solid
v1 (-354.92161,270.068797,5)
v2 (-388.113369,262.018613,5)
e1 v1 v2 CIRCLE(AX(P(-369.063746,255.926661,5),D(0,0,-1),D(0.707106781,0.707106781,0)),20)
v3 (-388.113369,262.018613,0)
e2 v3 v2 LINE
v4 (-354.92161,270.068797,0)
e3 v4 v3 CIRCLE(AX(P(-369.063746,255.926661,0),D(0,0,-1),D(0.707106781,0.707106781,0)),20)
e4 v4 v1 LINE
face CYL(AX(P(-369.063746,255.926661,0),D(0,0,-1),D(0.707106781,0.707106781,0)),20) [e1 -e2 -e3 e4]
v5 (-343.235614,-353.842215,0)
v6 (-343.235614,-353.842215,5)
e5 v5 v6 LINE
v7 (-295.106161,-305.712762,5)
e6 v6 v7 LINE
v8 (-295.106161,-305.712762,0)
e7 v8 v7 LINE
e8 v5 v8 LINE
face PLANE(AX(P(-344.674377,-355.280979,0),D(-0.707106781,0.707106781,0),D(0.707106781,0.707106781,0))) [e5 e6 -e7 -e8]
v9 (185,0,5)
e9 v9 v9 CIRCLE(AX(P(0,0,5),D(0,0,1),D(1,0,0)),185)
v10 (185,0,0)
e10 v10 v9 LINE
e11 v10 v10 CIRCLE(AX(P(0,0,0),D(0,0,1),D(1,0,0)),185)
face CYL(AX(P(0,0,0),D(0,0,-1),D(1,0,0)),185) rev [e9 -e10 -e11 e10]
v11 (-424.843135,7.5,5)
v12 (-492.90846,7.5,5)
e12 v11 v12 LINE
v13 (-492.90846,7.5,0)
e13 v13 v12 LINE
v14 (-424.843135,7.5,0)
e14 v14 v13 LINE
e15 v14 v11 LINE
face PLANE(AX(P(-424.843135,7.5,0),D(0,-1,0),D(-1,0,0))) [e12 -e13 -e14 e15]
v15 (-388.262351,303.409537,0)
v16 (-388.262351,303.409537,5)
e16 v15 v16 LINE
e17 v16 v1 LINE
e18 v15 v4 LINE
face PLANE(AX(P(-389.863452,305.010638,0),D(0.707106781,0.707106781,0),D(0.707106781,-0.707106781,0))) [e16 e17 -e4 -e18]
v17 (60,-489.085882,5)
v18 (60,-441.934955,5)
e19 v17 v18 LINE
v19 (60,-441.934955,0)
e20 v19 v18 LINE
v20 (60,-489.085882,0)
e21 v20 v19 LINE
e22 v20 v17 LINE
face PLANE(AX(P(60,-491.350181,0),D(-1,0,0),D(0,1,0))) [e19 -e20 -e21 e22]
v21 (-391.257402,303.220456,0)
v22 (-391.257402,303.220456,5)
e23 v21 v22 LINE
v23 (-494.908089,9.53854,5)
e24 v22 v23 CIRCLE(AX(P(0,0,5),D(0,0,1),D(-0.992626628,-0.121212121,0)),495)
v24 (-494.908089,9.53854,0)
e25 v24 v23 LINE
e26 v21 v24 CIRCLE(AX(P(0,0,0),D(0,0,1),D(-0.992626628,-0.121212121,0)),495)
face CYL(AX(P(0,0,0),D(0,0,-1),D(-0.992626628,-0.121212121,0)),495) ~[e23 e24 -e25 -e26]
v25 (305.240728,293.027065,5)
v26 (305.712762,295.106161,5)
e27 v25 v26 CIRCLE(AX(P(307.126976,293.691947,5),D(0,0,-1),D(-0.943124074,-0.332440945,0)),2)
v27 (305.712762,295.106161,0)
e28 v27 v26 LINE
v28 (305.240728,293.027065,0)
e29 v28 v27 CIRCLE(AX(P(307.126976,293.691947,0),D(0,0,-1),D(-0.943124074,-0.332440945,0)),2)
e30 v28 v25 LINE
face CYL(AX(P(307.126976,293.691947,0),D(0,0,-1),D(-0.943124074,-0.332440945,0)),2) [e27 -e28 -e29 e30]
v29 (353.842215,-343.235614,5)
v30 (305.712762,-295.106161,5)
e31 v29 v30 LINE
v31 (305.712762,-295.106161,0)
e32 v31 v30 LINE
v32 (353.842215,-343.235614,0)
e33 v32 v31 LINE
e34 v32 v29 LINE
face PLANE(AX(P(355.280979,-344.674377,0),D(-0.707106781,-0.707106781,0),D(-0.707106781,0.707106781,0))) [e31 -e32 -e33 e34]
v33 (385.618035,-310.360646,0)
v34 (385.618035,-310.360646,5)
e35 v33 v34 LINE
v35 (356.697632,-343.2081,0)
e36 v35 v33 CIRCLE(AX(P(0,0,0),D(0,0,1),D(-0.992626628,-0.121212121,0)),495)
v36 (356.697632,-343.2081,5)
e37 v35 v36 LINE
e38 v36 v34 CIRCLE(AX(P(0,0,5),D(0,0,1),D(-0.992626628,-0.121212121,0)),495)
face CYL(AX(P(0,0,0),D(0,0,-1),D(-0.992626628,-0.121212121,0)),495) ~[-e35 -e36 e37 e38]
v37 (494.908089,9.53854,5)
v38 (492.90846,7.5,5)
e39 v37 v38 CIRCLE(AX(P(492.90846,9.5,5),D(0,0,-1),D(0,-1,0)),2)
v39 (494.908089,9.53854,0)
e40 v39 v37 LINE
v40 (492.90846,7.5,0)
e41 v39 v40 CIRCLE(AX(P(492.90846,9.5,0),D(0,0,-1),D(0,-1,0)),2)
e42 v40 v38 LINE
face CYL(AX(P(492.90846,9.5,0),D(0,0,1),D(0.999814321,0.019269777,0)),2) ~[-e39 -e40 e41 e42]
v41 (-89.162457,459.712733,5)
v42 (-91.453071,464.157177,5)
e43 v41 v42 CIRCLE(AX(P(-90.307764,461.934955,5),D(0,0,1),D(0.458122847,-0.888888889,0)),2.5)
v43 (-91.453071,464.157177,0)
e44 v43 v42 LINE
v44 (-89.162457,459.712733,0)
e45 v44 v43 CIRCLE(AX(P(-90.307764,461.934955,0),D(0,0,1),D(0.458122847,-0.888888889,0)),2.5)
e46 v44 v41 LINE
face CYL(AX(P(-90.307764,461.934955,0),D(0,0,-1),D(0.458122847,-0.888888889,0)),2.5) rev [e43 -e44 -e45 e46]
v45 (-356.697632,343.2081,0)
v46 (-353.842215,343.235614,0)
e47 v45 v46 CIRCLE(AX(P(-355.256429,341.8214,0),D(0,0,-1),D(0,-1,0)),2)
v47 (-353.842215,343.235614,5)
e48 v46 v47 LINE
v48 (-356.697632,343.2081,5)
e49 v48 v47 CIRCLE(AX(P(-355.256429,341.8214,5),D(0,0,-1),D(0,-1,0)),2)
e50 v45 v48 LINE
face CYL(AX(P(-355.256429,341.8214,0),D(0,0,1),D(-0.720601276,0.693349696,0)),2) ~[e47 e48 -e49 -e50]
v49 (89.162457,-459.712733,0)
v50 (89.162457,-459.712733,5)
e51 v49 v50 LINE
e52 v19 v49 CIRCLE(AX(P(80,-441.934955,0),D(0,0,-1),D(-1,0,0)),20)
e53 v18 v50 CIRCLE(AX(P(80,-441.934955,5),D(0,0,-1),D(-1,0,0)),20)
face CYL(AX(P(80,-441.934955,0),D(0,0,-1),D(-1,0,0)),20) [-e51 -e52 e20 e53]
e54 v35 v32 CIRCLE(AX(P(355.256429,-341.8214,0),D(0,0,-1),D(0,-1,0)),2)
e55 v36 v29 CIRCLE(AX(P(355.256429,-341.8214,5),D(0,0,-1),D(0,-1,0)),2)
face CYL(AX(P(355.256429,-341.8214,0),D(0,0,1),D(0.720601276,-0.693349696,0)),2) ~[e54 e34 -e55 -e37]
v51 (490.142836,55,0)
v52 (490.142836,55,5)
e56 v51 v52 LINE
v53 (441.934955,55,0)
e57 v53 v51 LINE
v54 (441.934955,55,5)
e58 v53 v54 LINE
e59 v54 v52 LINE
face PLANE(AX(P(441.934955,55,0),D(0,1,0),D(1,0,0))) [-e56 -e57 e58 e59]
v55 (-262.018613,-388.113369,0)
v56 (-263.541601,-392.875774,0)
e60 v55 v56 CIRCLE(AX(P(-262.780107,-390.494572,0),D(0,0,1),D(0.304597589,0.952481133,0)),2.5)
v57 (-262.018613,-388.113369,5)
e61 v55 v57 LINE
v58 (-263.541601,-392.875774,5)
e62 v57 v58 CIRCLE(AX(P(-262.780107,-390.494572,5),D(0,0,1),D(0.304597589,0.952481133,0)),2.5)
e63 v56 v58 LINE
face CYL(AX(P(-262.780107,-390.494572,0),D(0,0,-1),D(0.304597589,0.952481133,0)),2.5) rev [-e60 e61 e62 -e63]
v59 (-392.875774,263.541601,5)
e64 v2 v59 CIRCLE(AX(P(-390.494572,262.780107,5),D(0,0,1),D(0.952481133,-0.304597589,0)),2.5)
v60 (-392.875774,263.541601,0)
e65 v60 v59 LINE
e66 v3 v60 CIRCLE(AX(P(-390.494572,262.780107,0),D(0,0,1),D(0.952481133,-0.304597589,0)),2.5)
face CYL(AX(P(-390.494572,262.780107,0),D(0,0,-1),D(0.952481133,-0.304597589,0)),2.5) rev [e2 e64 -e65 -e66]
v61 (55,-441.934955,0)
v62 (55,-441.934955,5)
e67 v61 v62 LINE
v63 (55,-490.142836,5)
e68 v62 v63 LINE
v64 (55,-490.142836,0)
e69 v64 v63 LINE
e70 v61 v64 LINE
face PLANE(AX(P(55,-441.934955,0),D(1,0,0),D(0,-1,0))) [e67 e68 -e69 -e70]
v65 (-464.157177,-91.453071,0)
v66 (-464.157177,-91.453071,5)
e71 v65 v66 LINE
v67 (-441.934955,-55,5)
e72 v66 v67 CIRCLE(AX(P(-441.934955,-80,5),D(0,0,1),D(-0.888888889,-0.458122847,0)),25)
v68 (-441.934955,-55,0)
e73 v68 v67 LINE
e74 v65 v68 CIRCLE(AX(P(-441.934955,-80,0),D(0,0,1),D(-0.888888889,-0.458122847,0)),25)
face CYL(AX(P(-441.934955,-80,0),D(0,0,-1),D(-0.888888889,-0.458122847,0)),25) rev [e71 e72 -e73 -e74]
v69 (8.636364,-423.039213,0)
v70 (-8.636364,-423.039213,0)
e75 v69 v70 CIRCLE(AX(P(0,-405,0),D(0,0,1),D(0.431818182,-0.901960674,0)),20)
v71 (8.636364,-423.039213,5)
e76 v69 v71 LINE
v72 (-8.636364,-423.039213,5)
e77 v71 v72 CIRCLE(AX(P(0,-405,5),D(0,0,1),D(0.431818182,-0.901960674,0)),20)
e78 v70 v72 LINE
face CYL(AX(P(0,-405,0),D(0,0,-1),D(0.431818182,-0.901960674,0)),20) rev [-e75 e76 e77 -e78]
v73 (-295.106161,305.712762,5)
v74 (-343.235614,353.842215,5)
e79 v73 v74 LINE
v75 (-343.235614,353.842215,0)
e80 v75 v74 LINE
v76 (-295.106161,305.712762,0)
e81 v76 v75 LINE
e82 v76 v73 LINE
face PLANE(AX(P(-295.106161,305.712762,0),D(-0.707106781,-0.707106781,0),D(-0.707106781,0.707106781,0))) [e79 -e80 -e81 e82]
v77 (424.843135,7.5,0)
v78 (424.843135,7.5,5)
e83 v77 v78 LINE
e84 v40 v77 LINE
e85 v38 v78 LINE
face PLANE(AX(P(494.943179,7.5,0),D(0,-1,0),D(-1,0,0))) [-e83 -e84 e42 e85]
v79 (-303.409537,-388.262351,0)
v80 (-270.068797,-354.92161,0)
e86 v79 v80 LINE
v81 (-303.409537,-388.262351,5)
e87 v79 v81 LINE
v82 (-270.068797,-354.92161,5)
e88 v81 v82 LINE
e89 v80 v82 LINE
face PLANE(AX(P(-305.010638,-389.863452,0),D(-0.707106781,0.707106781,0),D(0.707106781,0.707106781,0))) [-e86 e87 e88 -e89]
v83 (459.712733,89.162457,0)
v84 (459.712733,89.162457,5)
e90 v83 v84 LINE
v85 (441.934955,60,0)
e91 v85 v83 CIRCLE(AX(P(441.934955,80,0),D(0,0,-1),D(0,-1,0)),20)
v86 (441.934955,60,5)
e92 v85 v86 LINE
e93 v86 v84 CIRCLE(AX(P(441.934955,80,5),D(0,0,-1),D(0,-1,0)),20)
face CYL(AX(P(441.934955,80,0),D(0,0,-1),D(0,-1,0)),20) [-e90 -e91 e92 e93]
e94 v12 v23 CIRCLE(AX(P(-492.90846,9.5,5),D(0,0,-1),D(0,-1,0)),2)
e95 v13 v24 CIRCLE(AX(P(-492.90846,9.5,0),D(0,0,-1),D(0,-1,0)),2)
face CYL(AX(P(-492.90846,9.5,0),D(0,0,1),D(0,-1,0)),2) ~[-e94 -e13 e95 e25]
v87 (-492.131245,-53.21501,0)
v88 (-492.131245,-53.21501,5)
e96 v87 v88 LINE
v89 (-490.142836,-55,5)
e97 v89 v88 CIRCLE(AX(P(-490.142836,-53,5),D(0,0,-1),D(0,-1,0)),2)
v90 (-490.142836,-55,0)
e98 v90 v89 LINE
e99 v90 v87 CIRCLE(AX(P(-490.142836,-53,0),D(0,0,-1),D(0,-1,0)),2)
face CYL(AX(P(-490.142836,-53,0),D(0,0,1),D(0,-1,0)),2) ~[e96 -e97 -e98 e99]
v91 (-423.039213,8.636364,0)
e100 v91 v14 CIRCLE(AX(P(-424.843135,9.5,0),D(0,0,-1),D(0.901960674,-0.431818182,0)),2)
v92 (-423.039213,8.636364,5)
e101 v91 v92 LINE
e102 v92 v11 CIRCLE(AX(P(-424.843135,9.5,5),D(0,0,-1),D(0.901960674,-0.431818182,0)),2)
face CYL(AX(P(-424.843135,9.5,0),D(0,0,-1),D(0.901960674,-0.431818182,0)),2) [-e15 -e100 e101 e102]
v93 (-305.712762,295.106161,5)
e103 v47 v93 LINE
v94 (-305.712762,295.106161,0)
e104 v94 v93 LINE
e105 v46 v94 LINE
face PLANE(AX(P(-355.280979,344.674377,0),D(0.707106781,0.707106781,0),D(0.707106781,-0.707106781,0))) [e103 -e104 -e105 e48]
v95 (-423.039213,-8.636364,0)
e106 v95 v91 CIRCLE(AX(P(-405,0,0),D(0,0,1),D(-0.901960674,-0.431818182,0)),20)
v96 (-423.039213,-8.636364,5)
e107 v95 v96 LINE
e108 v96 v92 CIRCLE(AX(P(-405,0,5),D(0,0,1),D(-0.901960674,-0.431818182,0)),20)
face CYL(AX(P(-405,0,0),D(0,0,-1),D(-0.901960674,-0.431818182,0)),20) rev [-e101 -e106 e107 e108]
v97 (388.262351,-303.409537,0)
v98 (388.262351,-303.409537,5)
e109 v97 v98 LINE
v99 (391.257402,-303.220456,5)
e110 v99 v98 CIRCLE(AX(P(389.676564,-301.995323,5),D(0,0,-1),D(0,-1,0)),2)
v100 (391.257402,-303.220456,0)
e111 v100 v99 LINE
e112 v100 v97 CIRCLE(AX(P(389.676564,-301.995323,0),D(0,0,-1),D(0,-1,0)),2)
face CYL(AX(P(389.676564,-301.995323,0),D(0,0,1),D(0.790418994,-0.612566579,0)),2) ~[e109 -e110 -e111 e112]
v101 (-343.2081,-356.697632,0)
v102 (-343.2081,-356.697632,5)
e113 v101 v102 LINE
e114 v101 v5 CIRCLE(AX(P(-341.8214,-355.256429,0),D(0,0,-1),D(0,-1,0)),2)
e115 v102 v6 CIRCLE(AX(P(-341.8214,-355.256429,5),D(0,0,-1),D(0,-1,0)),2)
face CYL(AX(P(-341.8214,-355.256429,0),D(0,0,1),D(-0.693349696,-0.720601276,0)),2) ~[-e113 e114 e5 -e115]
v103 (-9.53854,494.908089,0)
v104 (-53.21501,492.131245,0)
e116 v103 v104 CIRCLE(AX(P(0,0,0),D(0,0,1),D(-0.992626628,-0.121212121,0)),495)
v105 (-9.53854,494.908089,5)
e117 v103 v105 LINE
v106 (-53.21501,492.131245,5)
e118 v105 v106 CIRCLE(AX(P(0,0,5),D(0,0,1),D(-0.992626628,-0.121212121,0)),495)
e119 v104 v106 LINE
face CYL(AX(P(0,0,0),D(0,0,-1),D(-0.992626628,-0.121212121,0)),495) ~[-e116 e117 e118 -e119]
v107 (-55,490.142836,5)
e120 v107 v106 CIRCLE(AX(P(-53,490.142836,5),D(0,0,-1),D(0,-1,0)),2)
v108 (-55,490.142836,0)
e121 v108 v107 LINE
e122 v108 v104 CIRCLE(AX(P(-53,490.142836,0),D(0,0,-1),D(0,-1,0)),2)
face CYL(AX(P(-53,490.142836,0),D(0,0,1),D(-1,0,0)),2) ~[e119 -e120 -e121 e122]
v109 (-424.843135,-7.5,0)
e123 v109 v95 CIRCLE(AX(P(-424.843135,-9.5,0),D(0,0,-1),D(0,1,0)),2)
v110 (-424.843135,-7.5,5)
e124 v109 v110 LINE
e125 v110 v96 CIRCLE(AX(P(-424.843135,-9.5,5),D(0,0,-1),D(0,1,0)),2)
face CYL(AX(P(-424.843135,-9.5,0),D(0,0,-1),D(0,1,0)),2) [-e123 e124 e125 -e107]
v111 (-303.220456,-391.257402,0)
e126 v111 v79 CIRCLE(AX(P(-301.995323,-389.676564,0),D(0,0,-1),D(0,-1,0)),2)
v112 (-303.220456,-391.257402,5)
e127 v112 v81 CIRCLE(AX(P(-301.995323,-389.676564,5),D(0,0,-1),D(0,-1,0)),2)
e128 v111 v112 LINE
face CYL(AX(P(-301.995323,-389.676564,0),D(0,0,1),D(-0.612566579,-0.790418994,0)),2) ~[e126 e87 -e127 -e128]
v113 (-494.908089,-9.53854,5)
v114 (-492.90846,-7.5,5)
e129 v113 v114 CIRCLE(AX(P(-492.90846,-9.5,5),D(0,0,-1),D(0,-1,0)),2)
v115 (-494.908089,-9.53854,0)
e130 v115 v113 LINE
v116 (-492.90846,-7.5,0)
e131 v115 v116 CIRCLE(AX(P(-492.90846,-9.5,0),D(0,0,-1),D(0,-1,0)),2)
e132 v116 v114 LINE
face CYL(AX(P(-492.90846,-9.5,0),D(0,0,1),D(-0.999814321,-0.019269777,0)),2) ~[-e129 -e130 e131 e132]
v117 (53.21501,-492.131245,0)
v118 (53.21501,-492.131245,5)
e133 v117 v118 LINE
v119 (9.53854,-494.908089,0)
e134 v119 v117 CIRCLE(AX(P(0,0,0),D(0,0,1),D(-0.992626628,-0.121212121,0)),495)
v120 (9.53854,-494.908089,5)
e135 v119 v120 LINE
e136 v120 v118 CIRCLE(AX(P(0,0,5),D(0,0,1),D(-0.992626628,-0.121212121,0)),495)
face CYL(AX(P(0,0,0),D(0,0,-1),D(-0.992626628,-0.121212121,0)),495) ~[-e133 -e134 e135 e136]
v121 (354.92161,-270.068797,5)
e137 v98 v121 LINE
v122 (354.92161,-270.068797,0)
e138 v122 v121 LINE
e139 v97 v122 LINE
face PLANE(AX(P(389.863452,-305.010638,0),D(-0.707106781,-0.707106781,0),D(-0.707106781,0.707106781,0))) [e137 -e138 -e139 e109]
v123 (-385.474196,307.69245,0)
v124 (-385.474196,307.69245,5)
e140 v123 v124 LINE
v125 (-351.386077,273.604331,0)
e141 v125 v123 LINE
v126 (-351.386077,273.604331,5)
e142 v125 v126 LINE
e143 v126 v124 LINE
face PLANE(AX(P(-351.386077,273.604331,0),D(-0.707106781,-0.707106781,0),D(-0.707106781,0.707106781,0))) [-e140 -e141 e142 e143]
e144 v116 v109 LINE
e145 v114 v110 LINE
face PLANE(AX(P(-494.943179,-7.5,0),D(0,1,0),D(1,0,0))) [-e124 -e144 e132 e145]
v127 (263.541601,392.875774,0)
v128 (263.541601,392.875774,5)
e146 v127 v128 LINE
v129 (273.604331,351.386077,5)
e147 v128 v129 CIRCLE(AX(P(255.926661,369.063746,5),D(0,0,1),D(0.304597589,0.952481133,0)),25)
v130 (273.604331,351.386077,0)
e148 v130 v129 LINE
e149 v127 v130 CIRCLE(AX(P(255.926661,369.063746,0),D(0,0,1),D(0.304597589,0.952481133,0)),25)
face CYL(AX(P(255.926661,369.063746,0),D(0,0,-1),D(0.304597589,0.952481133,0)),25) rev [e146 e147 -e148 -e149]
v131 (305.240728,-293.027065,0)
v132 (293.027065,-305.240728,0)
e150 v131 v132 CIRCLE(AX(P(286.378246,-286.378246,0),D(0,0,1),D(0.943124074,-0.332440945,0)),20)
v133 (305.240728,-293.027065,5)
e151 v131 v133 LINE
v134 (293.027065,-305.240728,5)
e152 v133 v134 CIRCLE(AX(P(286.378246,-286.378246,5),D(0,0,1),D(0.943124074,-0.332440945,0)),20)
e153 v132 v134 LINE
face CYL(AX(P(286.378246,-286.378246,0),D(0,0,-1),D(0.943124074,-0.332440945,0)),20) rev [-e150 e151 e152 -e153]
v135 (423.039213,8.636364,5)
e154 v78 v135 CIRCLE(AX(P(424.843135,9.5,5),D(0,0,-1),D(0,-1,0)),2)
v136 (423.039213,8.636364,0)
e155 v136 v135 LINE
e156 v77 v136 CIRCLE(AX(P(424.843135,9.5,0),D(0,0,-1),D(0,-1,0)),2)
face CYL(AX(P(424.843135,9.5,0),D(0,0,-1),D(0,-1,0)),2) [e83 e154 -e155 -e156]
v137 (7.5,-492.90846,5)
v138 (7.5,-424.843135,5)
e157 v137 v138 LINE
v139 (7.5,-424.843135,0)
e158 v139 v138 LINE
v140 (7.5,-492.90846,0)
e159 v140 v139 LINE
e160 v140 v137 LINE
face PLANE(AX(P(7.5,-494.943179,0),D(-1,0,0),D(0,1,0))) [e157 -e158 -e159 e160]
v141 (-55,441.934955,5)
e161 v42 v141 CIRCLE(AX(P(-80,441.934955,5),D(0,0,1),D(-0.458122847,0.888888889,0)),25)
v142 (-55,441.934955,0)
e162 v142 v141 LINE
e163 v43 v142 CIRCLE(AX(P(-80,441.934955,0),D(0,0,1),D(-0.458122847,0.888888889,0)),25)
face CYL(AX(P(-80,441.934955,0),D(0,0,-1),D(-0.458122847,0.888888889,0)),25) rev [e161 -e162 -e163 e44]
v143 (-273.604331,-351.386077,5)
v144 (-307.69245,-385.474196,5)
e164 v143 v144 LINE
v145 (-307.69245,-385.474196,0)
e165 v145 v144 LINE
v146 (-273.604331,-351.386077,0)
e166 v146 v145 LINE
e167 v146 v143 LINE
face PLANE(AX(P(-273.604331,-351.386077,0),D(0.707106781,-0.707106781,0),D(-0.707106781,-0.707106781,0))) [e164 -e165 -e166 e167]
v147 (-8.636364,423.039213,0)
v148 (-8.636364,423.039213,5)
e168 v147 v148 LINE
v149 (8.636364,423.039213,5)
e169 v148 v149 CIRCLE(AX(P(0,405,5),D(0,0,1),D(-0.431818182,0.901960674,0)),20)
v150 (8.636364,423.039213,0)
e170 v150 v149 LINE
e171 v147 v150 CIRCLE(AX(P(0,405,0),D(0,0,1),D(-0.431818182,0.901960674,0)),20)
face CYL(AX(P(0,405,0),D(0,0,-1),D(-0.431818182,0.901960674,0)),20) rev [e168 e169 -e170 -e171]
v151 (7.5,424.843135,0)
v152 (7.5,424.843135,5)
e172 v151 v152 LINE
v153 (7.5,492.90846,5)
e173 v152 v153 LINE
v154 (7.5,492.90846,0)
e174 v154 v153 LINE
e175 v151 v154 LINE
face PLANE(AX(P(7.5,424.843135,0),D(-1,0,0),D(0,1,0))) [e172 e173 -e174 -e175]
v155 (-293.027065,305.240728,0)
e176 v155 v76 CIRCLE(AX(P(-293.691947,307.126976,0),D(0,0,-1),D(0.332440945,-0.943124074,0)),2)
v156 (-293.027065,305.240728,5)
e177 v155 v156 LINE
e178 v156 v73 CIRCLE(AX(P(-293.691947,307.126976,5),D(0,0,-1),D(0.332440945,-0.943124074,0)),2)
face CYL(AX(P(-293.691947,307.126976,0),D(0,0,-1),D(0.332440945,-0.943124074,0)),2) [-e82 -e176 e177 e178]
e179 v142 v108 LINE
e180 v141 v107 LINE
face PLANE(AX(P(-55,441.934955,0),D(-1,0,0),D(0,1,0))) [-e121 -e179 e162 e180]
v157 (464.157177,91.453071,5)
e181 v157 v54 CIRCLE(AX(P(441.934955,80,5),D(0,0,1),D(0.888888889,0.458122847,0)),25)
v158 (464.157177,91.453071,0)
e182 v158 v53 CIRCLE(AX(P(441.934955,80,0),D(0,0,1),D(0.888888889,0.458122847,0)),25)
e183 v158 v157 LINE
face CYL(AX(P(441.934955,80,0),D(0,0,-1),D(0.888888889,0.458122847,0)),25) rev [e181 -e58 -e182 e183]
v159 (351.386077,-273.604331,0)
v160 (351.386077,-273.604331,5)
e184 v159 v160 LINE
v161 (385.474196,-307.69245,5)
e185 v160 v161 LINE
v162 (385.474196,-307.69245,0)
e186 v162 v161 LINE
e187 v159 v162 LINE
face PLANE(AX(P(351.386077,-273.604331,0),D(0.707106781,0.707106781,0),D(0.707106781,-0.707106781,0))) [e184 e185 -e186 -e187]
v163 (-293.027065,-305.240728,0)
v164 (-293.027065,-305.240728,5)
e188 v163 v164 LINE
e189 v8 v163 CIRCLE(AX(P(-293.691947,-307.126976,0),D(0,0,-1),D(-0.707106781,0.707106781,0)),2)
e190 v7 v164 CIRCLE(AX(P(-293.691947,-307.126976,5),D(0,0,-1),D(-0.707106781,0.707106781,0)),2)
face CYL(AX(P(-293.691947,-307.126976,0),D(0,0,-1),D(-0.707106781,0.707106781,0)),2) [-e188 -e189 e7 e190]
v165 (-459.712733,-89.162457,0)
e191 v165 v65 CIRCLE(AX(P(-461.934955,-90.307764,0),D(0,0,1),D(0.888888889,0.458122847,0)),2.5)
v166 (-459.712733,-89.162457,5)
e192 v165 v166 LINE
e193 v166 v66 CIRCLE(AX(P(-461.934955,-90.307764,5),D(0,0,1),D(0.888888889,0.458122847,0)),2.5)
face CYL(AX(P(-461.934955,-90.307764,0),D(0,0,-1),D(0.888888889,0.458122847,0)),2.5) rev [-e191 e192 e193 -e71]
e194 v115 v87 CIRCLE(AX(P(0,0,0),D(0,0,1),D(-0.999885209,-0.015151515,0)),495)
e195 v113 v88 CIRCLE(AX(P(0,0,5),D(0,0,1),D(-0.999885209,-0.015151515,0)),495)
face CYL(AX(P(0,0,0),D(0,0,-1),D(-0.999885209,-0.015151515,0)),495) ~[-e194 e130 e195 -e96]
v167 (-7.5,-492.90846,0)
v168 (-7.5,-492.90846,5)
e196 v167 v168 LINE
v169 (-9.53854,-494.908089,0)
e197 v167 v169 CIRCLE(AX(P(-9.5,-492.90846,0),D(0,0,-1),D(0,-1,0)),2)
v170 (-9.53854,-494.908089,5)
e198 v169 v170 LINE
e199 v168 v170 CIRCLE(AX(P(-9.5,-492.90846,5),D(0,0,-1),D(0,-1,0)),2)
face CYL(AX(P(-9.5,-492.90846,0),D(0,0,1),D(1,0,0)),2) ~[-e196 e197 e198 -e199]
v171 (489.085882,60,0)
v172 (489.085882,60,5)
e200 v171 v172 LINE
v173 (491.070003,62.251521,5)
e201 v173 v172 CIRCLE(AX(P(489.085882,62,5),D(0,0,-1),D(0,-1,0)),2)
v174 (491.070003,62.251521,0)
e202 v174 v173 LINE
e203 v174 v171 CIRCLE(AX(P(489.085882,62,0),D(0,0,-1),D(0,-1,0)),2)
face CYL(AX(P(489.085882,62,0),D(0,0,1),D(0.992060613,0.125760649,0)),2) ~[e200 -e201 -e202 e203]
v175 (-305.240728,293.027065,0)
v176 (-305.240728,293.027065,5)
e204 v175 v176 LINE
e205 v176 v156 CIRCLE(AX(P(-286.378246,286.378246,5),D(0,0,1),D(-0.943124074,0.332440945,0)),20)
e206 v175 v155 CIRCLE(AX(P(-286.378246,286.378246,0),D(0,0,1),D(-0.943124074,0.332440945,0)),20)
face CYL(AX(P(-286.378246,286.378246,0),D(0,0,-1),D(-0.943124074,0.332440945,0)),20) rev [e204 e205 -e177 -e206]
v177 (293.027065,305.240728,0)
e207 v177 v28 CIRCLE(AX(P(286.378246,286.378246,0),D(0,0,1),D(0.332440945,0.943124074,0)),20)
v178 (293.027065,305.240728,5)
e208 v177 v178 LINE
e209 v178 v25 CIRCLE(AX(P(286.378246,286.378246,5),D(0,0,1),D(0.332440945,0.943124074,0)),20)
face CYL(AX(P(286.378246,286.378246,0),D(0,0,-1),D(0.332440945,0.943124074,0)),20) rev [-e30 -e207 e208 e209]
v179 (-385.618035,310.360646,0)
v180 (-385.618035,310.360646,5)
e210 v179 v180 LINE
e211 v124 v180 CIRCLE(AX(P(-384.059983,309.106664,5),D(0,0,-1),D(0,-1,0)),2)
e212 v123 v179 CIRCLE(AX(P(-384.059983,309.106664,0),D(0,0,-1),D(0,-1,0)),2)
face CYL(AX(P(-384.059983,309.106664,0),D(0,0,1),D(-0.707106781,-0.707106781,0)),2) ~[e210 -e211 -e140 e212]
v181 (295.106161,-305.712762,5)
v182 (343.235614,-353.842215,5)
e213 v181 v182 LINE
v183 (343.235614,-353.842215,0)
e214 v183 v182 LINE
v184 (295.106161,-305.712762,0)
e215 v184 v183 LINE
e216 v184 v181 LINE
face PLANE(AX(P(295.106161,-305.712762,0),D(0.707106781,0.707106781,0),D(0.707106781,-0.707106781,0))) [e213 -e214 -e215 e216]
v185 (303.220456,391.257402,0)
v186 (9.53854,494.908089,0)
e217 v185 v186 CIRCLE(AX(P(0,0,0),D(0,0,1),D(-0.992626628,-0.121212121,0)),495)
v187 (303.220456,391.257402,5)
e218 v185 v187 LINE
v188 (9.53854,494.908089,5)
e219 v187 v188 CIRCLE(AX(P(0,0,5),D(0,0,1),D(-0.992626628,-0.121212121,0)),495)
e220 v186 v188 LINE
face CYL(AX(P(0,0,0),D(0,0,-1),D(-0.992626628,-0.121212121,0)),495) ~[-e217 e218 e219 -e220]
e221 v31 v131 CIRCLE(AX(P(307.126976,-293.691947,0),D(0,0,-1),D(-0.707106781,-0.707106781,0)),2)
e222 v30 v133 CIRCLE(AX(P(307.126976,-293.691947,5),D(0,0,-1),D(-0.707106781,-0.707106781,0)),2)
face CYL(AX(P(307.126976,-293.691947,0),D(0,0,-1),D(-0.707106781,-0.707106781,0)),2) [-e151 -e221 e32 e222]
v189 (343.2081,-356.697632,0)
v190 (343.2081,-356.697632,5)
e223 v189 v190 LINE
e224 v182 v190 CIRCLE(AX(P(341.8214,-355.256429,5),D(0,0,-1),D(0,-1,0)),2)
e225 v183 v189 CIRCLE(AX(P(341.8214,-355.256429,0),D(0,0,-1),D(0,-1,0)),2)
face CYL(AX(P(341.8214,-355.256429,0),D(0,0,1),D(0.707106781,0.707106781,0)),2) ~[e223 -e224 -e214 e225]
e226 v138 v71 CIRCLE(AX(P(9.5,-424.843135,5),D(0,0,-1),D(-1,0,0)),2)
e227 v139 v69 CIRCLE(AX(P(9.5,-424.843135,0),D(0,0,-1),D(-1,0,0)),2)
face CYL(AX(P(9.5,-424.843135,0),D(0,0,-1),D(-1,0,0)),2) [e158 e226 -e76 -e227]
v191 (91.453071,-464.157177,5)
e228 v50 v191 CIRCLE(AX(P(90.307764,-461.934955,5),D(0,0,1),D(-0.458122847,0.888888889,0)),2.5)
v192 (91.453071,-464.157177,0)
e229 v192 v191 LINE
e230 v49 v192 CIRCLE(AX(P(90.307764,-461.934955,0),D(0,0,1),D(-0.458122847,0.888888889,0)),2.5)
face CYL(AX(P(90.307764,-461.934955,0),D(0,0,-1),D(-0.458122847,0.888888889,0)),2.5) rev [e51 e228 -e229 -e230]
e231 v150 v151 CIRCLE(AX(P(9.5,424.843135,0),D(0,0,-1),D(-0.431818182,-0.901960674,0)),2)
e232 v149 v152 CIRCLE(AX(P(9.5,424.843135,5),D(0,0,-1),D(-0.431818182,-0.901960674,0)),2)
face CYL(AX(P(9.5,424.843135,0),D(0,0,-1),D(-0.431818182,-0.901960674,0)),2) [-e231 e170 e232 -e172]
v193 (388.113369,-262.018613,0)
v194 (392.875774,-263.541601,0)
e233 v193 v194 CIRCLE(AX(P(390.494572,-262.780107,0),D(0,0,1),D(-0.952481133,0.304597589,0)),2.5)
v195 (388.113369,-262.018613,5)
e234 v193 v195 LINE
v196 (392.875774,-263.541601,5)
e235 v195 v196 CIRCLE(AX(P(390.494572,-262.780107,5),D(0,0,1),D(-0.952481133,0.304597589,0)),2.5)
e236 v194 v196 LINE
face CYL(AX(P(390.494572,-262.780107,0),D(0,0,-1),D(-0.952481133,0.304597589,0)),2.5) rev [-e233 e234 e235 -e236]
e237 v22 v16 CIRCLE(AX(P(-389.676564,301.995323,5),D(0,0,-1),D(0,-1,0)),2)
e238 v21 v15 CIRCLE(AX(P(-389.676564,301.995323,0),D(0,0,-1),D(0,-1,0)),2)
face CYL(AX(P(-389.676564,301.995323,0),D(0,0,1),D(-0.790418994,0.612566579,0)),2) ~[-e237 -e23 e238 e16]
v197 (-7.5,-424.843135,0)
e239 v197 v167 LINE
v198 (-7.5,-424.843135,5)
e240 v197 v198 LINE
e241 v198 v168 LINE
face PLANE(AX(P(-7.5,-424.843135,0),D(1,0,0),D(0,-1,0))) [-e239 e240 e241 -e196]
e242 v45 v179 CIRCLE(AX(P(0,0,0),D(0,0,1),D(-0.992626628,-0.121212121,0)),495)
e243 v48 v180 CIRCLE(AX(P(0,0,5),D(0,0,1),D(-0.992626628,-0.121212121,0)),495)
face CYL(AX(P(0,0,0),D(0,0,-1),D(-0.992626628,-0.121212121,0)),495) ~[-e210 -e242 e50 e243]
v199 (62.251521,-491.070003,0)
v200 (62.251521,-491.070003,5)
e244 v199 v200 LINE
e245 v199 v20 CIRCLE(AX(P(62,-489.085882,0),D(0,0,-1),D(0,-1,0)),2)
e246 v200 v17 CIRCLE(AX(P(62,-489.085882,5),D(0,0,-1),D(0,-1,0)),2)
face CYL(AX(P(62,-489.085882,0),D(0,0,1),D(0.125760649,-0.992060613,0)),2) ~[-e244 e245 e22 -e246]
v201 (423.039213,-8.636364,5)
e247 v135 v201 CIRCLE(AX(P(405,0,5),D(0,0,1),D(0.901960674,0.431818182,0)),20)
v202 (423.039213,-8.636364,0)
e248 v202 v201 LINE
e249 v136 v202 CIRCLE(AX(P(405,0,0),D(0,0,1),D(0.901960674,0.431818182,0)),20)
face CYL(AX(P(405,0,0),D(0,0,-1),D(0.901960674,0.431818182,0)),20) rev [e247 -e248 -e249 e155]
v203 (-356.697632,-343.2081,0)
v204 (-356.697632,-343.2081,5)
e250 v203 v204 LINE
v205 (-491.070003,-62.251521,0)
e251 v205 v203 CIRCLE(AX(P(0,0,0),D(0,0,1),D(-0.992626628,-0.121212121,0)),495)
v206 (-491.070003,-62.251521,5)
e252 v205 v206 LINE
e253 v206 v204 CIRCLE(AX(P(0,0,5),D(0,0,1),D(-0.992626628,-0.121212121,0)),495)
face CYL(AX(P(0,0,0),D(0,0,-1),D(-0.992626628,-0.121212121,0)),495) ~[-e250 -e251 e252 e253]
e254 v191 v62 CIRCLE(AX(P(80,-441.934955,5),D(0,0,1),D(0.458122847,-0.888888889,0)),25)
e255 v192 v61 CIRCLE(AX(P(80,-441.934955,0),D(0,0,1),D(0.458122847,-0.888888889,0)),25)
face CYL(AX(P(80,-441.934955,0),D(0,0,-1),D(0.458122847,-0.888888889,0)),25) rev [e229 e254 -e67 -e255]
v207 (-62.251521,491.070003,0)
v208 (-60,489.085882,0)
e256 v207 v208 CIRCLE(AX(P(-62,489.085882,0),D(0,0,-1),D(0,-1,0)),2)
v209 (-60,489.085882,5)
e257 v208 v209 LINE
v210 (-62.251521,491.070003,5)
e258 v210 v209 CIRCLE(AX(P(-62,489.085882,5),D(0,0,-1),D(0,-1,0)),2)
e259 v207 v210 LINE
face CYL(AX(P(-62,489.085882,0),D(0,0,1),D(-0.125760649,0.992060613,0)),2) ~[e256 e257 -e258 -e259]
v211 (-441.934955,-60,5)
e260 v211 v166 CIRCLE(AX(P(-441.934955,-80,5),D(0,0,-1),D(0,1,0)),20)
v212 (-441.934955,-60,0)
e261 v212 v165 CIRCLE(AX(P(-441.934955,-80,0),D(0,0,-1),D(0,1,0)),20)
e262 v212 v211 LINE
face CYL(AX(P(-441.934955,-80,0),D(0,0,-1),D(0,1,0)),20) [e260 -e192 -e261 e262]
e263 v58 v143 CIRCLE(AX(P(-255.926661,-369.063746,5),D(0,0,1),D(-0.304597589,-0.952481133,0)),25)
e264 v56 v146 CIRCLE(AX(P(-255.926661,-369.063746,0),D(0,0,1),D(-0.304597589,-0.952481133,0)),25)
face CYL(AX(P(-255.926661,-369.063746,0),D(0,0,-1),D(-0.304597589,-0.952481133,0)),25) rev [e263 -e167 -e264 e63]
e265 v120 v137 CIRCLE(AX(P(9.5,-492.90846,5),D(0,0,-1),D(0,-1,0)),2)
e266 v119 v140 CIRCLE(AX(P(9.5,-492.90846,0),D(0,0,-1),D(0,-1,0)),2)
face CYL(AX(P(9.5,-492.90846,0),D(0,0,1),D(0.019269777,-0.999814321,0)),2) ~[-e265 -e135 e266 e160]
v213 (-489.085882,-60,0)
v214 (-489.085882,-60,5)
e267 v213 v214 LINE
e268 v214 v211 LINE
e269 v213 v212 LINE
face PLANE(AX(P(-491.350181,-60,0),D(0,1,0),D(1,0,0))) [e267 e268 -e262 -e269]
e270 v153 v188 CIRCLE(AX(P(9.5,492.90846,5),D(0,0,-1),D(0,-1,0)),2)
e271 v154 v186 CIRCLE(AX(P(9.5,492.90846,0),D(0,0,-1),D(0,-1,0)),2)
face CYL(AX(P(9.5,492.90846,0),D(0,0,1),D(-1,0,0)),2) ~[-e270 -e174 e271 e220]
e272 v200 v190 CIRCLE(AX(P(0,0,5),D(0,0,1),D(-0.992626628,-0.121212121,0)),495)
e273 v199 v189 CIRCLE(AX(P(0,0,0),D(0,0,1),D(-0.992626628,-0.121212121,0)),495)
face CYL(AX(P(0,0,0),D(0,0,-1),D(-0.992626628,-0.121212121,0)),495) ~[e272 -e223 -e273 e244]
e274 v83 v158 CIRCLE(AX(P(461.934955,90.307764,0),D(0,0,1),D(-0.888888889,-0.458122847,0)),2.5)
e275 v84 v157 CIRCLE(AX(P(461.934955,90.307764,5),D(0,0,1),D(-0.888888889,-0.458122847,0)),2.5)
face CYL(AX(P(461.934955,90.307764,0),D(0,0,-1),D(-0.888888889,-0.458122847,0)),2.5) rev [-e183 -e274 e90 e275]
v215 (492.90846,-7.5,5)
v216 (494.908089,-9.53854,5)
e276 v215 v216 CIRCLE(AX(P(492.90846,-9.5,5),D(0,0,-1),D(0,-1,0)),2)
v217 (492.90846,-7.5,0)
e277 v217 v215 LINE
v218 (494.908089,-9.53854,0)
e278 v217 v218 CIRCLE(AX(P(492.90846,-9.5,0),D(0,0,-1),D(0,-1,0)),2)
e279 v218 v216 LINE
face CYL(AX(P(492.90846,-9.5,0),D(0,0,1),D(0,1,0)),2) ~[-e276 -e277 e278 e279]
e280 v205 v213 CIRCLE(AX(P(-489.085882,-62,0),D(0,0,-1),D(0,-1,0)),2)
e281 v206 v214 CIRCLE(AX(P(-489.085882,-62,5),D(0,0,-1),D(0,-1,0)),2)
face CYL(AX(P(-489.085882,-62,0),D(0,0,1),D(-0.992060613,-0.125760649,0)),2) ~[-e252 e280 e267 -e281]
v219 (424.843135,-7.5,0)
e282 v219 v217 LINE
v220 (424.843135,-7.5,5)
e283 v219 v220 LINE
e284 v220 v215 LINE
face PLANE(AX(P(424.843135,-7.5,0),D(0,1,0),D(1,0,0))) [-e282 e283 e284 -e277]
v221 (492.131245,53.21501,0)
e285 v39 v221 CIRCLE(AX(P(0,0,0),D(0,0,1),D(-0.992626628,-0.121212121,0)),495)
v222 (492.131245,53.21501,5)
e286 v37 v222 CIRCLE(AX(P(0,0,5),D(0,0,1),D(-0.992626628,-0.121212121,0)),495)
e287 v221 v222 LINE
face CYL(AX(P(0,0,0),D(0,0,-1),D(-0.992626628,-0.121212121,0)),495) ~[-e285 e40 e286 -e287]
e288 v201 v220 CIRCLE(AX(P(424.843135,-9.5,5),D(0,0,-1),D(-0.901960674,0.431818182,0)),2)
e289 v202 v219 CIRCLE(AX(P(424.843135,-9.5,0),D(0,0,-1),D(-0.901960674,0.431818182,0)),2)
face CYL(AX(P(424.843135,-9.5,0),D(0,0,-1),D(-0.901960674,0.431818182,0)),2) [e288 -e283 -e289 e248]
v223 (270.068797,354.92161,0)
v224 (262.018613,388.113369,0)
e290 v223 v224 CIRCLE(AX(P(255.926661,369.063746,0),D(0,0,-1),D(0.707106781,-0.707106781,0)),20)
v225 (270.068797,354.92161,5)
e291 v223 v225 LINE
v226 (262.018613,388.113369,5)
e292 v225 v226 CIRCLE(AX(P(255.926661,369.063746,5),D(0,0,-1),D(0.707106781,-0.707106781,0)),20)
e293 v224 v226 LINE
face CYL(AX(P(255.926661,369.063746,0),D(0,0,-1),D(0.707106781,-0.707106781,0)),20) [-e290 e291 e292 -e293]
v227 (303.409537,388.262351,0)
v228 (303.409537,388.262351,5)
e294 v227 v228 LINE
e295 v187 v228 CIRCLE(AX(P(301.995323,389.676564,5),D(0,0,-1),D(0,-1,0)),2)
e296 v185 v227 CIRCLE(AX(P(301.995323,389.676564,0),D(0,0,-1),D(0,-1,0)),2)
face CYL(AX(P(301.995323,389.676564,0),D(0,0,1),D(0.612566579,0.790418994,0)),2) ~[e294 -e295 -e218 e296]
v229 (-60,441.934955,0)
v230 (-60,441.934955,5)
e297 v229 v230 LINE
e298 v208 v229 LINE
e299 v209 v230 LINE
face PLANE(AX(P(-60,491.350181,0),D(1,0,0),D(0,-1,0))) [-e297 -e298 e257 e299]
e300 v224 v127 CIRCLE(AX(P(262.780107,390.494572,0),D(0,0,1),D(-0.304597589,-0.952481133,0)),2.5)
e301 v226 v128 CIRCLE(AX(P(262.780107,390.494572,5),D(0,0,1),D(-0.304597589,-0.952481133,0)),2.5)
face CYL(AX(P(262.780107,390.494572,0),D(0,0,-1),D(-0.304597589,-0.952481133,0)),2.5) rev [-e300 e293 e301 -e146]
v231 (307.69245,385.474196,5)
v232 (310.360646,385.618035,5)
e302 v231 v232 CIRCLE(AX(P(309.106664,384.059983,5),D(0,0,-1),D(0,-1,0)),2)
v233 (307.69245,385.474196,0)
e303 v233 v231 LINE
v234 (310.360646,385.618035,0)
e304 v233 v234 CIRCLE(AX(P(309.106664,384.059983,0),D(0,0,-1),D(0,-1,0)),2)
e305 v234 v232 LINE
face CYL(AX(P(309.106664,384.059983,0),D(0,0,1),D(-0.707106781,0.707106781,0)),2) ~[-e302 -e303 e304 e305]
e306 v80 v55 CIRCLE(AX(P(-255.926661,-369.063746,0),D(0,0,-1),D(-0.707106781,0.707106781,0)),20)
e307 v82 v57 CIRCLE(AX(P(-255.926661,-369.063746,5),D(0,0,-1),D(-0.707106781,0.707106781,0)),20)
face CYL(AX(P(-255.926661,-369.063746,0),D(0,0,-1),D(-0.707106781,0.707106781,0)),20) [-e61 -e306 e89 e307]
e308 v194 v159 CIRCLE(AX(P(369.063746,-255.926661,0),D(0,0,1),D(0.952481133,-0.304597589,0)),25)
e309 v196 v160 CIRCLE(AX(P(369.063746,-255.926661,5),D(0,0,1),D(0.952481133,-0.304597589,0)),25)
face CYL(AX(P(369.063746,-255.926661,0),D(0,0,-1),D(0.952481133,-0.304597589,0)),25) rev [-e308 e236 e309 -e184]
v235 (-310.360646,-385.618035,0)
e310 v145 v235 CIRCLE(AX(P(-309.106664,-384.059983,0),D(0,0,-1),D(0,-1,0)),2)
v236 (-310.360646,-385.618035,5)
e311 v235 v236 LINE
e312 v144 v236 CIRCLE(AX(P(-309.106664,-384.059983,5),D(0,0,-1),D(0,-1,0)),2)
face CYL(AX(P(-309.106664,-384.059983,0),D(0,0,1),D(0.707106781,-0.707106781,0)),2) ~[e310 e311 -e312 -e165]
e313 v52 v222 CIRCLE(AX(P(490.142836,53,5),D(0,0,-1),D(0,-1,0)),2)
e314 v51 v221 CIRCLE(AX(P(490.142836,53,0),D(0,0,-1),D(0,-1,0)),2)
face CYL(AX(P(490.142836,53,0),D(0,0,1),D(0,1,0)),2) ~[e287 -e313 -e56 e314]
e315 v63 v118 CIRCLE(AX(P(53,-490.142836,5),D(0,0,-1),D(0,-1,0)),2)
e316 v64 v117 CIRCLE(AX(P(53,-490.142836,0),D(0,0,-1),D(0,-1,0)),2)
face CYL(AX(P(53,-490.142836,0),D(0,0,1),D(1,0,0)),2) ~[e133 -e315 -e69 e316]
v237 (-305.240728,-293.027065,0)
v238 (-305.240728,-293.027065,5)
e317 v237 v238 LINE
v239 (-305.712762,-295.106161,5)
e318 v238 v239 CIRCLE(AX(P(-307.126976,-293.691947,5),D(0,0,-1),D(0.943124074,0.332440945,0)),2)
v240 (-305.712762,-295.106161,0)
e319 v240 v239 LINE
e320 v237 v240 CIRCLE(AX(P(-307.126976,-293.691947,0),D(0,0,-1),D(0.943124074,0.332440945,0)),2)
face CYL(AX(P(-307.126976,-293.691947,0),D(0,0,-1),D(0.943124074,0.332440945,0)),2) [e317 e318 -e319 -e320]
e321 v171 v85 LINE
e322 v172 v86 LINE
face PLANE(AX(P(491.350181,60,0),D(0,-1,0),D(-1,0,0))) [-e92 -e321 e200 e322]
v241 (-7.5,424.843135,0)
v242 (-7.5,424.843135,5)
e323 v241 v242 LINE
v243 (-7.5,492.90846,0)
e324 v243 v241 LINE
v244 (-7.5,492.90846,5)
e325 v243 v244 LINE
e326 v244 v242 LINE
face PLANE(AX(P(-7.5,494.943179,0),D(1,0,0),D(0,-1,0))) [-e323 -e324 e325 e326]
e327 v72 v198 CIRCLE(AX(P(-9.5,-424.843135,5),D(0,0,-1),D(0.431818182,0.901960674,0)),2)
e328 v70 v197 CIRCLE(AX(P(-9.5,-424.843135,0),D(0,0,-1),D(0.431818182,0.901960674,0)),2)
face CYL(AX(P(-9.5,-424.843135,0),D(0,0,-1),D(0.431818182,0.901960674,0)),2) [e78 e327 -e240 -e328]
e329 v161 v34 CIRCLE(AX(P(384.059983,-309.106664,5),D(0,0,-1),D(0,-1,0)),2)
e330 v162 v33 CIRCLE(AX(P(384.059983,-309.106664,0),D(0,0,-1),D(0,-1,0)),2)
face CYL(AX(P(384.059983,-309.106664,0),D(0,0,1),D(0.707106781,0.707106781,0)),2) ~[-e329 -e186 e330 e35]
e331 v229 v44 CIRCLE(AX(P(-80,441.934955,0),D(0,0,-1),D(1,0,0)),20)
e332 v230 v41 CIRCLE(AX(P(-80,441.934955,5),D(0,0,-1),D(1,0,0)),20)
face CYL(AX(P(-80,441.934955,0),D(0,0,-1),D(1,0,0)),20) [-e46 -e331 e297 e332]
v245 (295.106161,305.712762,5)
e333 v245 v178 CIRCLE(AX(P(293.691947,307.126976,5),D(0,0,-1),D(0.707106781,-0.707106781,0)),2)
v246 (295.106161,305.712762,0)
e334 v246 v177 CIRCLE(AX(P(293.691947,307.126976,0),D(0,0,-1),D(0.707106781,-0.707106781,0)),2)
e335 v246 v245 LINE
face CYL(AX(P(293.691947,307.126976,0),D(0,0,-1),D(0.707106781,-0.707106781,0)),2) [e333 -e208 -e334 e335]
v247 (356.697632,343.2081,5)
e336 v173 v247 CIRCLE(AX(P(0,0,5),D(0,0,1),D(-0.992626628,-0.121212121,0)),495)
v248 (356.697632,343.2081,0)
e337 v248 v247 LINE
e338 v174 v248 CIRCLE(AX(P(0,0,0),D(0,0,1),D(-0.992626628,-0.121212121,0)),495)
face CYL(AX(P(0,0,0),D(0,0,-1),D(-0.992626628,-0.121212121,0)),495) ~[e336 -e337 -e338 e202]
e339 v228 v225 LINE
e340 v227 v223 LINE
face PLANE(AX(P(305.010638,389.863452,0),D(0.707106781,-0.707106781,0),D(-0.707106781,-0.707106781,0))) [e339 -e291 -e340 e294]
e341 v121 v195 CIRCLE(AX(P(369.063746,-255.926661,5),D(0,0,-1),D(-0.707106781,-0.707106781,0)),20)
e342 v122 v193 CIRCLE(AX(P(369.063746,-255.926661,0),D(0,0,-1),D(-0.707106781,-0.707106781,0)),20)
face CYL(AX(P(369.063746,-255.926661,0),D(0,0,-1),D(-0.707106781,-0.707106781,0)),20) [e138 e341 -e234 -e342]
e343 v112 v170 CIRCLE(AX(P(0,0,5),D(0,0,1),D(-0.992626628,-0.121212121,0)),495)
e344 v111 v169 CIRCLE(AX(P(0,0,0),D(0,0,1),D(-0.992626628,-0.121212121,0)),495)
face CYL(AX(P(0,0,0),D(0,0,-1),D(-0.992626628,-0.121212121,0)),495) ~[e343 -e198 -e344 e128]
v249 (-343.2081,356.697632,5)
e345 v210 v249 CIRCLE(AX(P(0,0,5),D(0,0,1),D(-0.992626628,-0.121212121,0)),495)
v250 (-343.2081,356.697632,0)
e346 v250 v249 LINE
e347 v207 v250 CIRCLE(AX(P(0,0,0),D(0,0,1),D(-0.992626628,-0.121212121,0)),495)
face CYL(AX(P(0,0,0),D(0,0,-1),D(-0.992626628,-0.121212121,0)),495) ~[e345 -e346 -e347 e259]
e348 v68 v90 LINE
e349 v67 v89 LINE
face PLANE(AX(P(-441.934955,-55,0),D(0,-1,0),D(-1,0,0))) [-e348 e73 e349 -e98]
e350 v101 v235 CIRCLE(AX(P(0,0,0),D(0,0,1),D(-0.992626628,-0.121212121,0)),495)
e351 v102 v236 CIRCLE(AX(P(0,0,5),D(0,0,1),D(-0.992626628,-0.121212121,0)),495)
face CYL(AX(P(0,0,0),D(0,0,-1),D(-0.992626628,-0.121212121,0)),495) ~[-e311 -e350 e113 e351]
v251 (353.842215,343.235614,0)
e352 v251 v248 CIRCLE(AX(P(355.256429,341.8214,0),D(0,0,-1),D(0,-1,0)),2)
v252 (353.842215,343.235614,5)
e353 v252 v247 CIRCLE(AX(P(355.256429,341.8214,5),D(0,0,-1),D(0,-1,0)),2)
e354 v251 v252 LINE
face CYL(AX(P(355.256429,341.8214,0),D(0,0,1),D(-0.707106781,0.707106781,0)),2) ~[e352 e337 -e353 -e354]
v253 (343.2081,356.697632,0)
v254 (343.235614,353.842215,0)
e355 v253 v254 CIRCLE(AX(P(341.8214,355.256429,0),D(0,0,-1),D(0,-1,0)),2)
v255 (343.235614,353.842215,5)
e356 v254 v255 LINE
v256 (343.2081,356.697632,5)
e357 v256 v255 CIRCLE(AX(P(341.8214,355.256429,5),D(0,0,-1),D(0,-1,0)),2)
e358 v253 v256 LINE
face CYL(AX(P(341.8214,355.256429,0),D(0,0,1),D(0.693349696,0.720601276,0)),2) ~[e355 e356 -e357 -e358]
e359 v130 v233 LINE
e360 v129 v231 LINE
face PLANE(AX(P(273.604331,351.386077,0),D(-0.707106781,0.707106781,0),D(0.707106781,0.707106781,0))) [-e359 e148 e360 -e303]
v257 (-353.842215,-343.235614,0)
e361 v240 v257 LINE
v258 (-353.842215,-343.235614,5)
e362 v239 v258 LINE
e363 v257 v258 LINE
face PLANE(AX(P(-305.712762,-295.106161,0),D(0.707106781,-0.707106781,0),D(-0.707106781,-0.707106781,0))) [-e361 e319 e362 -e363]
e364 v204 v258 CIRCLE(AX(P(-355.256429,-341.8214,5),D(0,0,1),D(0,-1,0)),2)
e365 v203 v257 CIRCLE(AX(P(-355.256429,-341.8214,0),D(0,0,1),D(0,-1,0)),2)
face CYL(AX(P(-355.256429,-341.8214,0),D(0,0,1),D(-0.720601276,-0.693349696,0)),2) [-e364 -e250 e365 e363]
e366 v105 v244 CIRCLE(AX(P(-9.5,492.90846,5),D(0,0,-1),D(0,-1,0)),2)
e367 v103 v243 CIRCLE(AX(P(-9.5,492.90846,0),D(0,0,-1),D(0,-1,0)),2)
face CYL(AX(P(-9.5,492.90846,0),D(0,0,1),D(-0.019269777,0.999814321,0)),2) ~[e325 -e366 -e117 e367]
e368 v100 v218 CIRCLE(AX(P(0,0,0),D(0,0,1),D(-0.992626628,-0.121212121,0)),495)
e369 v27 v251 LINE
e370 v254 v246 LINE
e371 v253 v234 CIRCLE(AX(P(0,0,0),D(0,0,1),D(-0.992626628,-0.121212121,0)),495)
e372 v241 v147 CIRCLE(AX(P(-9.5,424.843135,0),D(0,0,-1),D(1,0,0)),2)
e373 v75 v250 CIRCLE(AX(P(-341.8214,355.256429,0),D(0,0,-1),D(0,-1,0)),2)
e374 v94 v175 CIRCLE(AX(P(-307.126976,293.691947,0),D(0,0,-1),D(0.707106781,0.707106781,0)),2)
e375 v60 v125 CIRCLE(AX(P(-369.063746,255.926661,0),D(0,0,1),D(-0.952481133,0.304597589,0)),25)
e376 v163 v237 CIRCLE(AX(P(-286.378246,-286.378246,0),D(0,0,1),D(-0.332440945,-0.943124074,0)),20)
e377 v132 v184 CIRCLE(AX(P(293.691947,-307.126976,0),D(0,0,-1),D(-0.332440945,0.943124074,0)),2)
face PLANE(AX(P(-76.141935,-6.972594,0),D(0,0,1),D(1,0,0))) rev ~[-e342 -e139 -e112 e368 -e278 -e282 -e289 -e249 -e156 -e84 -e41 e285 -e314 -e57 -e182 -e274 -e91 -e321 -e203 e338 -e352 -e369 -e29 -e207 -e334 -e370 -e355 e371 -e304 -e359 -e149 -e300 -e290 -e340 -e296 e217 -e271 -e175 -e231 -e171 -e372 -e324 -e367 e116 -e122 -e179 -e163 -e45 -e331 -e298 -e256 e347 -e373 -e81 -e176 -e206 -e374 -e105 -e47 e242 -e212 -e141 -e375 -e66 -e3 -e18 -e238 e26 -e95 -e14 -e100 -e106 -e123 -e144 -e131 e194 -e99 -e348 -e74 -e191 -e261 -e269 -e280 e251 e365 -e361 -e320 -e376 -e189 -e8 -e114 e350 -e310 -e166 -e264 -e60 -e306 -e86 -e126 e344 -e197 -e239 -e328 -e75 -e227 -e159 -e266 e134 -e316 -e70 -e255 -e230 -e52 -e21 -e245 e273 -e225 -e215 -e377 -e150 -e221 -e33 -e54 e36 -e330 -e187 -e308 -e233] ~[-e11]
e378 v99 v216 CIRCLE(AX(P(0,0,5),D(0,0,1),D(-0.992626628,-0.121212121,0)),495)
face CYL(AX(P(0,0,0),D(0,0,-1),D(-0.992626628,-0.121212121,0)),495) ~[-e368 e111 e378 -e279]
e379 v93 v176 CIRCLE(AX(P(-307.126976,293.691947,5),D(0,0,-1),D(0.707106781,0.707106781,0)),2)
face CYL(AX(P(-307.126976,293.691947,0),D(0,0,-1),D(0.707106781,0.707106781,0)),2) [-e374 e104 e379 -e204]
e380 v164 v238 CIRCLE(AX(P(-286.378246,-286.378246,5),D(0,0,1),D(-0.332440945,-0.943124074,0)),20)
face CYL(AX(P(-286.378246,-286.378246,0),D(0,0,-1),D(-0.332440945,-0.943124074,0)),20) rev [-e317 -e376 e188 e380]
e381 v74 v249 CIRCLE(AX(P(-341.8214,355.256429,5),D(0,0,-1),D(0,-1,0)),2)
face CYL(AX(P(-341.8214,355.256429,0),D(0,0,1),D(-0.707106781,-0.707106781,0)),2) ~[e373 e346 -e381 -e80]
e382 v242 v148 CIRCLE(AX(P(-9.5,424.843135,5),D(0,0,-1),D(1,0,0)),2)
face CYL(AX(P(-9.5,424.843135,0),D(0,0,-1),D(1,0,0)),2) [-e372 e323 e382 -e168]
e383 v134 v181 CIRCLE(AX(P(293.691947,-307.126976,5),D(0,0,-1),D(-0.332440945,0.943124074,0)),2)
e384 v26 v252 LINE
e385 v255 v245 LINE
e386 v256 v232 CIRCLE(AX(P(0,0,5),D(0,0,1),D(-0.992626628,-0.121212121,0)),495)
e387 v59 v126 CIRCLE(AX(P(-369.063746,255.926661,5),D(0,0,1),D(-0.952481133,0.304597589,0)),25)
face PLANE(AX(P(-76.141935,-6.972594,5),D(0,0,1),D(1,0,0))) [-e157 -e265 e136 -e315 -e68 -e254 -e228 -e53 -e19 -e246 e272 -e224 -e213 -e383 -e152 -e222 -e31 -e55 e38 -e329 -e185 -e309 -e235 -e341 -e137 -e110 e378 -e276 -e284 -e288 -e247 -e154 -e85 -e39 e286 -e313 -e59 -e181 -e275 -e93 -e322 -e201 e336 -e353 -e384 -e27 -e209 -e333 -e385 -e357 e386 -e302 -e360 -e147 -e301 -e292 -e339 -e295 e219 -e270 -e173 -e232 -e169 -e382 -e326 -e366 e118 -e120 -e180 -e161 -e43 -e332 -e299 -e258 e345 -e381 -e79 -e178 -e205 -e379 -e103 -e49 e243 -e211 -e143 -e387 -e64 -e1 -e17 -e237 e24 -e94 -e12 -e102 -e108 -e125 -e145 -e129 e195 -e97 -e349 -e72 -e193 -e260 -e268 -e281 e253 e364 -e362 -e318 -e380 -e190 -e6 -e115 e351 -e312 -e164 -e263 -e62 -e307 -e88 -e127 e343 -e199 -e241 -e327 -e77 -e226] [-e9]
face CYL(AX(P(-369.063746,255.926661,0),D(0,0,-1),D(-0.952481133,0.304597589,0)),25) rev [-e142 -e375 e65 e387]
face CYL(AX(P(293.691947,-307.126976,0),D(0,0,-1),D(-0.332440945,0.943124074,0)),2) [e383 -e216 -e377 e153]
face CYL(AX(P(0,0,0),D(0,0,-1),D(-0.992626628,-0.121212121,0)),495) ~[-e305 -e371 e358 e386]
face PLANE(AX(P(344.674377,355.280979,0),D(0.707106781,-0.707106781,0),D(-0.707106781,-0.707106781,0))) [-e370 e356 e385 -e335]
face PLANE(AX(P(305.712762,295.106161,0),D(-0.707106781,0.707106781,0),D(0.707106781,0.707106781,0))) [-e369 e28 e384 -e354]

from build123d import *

# Parameters (mm, degrees)
F0_R            = 185
F2_DEPTH        = 5
F3_DEPTH        = 5
F3_COPIES_COUNT = 8
F4_R            = 2


# Not quite as in the source:
# - a pattern or mirror of a feature is missing from the dataset's text; its kind, count and spacing are read off the source's solid
# - a feature names something its author has since deleted; it is built from what else it names


with BuildPart() as f2:
    # F0 (on Top) → F2 (new body)
    with BuildSketch(Plane.XY):
        with BuildLine():
            ThreePointArc((-491.3501806248, -60), (30.055453671, -494.0867026187), (495, 0))
            ThreePointArc((495, 0), (3.750107621, 494.9857944354), (-494.9431785569, 7.5))
            Line((-494.9431785569, 7.5), (-424.843134833, 7.5))
            ThreePointArc((-424.843134833, 7.5), (-423.7771312512, 7.8077717755), (-423.0392134845, 8.6363636364))
            ThreePointArc((-423.0392134845, 8.6363636364), (-385, 0), (-423.0392134845, -8.6363636364))
            ThreePointArc((-423.0392134845, -8.6363636364), (-423.7771312512, -7.8077717755), (-424.843134833, -7.5))
            Line((-424.843134833, -7.5), (-494.9431785569, -7.5))
            ThreePointArc((-494.9431785569, -7.5), (-494.0102986253, -31.2861766946), (-491.93495505, -55))
            Line((-491.93495505, -55), (-441.93495505, -55))
            ThreePointArc((-441.93495505, -55), (-420.5886816099, -93.0129401067), (-464.1571772722, -91.4530711823))
            ThreePointArc((-464.1571772722, -91.4530711823), (-463.0802621682, -88.0855418418), (-459.7127328277, -89.1624569458))
            ThreePointArc((-459.7127328277, -89.1624569458), (-424.8579362979, -90.4103520854), (-441.93495505, -60))
            Line((-441.93495505, -60), (-491.3501806248, -60))
        make_face()
        Circle(F0_R, mode=Mode.SUBTRACT)
        with BuildLine():
            Line((-424.843134833, 7.5), (-494.9431785569, 7.5))
            ThreePointArc((-494.9431785569, 7.5), (-495, 0), (-494.9431785569, -7.5))
            Line((-494.9431785569, -7.5), (-424.843134833, -7.5))
            ThreePointArc((-424.843134833, -7.5), (-423.7771312512, -7.8077717755), (-423.0392134845, -8.6363636364))
            ThreePointArc((-423.0392134845, -8.6363636364), (-385, 0), (-423.0392134845, 8.6363636364))
            ThreePointArc((-423.0392134845, 8.6363636364), (-423.7771312512, 7.8077717755), (-424.843134833, 7.5))
        make_face()
        with BuildLine():
            ThreePointArc((-491.93495505, -55), (-491.64892404, -57.500743389), (-491.3501806248, -60))
            Line((-491.3501806248, -60), (-441.93495505, -60))
            ThreePointArc((-441.93495505, -60), (-424.8579362979, -90.4103520854), (-459.7127328277, -89.1624569458))
            ThreePointArc((-459.7127328277, -89.1624569458), (-463.0802621682, -88.0855418418), (-464.1571772722, -91.4530711823))
            ThreePointArc((-464.1571772722, -91.4530711823), (-420.5886816099, -93.0129401067), (-441.93495505, -55))
            Line((-441.93495505, -55), (-491.93495505, -55))
        make_face()
    extrude(amount=F2_DEPTH)

    # F0 (on Top) → F3 (cut, through all)
    with BuildSketch(Plane.XY):
        with BuildLine():
            Line((-424.843134833, 7.5), (-494.9431785569, 7.5))
            ThreePointArc((-494.9431785569, 7.5), (-495, 0), (-494.9431785569, -7.5))
            Line((-494.9431785569, -7.5), (-424.843134833, -7.5))
            ThreePointArc((-424.843134833, -7.5), (-423.7771312512, -7.8077717755), (-423.0392134845, -8.6363636364))
            ThreePointArc((-423.0392134845, -8.6363636364), (-385, 0), (-423.0392134845, 8.6363636364))
            ThreePointArc((-423.0392134845, 8.6363636364), (-423.7771312512, 7.8077717755), (-424.843134833, 7.5))
        make_face()
        with BuildLine():
            ThreePointArc((-491.93495505, -55), (-491.64892404, -57.500743389), (-491.3501806248, -60))
            Line((-491.3501806248, -60), (-441.93495505, -60))
            ThreePointArc((-441.93495505, -60), (-424.8579362979, -90.4103520854), (-459.7127328277, -89.1624569458))
            ThreePointArc((-459.7127328277, -89.1624569458), (-463.0802621682, -88.0855418418), (-464.1571772722, -91.4530711823))
            ThreePointArc((-464.1571772722, -91.4530711823), (-420.5886816099, -93.0129401067), (-441.93495505, -55))
            Line((-441.93495505, -55), (-491.93495505, -55))
        make_face()
    f3 = extrude(amount=F3_DEPTH, mode=Mode.SUBTRACT)

    # F3_copies: F3 ×8 about axis
    f3_copies_axis = Axis((0, 0, 0), (0, 0, 1))
    for i in range(1, F3_COPIES_COUNT):
        add(f3.rotate(f3_copies_axis, i * 360 / F3_COPIES_COUNT), mode=Mode.SUBTRACT)

    # F4
    f4_edges = [f2.edges().sort_by_distance(p)[0] for p in [
        (-494.943179, -7.5, 2.5),
        (-494.943179, 7.5, 2.5),
        (-491.934955, -55, 2.5),
        (-491.350181, -60, 2.5),
        (-355.280979, -344.674377, 2.5),
        (-389.863452, 305.010638, 2.5),
        (-386.741416, 308.95967, 2.5),
        (-355.280979, 344.674377, 2.5),
        (-344.674377, 355.280979, 2.5),
        (-60, 491.350181, 2.5),
        (-55, 491.934955, 2.5),
        (-7.5, 494.943179, 2.5),
        (7.5, 494.943179, 2.5),
        (305.010638, 389.863452, 2.5),
        (308.95967, 386.741416, 2.5),
        (344.674377, 355.280979, 2.5),
        (355.280979, 344.674377, 2.5),
        (491.350181, 60, 2.5),
        (491.934955, 55, 2.5),
        (494.943179, 7.5, 2.5),
        (494.943179, -7.5, 2.5),
        (389.863452, -305.010638, 2.5),
        (386.741416, -308.95967, 2.5),
        (355.280979, -344.674377, 2.5),
        (344.674377, -355.280979, 2.5),
        (60, -491.350181, 2.5),
        (55, -491.934955, 2.5),
        (7.5, -494.943179, 2.5),
        (-7.5, -494.943179, 2.5),
        (-305.010638, -389.863452, 2.5),
        (-308.95967, -386.741416, 2.5),
        (-344.674377, -355.280979, 2.5),
    ]]
    fillet(f4_edges, radius=F4_R)


solid = f2.part
